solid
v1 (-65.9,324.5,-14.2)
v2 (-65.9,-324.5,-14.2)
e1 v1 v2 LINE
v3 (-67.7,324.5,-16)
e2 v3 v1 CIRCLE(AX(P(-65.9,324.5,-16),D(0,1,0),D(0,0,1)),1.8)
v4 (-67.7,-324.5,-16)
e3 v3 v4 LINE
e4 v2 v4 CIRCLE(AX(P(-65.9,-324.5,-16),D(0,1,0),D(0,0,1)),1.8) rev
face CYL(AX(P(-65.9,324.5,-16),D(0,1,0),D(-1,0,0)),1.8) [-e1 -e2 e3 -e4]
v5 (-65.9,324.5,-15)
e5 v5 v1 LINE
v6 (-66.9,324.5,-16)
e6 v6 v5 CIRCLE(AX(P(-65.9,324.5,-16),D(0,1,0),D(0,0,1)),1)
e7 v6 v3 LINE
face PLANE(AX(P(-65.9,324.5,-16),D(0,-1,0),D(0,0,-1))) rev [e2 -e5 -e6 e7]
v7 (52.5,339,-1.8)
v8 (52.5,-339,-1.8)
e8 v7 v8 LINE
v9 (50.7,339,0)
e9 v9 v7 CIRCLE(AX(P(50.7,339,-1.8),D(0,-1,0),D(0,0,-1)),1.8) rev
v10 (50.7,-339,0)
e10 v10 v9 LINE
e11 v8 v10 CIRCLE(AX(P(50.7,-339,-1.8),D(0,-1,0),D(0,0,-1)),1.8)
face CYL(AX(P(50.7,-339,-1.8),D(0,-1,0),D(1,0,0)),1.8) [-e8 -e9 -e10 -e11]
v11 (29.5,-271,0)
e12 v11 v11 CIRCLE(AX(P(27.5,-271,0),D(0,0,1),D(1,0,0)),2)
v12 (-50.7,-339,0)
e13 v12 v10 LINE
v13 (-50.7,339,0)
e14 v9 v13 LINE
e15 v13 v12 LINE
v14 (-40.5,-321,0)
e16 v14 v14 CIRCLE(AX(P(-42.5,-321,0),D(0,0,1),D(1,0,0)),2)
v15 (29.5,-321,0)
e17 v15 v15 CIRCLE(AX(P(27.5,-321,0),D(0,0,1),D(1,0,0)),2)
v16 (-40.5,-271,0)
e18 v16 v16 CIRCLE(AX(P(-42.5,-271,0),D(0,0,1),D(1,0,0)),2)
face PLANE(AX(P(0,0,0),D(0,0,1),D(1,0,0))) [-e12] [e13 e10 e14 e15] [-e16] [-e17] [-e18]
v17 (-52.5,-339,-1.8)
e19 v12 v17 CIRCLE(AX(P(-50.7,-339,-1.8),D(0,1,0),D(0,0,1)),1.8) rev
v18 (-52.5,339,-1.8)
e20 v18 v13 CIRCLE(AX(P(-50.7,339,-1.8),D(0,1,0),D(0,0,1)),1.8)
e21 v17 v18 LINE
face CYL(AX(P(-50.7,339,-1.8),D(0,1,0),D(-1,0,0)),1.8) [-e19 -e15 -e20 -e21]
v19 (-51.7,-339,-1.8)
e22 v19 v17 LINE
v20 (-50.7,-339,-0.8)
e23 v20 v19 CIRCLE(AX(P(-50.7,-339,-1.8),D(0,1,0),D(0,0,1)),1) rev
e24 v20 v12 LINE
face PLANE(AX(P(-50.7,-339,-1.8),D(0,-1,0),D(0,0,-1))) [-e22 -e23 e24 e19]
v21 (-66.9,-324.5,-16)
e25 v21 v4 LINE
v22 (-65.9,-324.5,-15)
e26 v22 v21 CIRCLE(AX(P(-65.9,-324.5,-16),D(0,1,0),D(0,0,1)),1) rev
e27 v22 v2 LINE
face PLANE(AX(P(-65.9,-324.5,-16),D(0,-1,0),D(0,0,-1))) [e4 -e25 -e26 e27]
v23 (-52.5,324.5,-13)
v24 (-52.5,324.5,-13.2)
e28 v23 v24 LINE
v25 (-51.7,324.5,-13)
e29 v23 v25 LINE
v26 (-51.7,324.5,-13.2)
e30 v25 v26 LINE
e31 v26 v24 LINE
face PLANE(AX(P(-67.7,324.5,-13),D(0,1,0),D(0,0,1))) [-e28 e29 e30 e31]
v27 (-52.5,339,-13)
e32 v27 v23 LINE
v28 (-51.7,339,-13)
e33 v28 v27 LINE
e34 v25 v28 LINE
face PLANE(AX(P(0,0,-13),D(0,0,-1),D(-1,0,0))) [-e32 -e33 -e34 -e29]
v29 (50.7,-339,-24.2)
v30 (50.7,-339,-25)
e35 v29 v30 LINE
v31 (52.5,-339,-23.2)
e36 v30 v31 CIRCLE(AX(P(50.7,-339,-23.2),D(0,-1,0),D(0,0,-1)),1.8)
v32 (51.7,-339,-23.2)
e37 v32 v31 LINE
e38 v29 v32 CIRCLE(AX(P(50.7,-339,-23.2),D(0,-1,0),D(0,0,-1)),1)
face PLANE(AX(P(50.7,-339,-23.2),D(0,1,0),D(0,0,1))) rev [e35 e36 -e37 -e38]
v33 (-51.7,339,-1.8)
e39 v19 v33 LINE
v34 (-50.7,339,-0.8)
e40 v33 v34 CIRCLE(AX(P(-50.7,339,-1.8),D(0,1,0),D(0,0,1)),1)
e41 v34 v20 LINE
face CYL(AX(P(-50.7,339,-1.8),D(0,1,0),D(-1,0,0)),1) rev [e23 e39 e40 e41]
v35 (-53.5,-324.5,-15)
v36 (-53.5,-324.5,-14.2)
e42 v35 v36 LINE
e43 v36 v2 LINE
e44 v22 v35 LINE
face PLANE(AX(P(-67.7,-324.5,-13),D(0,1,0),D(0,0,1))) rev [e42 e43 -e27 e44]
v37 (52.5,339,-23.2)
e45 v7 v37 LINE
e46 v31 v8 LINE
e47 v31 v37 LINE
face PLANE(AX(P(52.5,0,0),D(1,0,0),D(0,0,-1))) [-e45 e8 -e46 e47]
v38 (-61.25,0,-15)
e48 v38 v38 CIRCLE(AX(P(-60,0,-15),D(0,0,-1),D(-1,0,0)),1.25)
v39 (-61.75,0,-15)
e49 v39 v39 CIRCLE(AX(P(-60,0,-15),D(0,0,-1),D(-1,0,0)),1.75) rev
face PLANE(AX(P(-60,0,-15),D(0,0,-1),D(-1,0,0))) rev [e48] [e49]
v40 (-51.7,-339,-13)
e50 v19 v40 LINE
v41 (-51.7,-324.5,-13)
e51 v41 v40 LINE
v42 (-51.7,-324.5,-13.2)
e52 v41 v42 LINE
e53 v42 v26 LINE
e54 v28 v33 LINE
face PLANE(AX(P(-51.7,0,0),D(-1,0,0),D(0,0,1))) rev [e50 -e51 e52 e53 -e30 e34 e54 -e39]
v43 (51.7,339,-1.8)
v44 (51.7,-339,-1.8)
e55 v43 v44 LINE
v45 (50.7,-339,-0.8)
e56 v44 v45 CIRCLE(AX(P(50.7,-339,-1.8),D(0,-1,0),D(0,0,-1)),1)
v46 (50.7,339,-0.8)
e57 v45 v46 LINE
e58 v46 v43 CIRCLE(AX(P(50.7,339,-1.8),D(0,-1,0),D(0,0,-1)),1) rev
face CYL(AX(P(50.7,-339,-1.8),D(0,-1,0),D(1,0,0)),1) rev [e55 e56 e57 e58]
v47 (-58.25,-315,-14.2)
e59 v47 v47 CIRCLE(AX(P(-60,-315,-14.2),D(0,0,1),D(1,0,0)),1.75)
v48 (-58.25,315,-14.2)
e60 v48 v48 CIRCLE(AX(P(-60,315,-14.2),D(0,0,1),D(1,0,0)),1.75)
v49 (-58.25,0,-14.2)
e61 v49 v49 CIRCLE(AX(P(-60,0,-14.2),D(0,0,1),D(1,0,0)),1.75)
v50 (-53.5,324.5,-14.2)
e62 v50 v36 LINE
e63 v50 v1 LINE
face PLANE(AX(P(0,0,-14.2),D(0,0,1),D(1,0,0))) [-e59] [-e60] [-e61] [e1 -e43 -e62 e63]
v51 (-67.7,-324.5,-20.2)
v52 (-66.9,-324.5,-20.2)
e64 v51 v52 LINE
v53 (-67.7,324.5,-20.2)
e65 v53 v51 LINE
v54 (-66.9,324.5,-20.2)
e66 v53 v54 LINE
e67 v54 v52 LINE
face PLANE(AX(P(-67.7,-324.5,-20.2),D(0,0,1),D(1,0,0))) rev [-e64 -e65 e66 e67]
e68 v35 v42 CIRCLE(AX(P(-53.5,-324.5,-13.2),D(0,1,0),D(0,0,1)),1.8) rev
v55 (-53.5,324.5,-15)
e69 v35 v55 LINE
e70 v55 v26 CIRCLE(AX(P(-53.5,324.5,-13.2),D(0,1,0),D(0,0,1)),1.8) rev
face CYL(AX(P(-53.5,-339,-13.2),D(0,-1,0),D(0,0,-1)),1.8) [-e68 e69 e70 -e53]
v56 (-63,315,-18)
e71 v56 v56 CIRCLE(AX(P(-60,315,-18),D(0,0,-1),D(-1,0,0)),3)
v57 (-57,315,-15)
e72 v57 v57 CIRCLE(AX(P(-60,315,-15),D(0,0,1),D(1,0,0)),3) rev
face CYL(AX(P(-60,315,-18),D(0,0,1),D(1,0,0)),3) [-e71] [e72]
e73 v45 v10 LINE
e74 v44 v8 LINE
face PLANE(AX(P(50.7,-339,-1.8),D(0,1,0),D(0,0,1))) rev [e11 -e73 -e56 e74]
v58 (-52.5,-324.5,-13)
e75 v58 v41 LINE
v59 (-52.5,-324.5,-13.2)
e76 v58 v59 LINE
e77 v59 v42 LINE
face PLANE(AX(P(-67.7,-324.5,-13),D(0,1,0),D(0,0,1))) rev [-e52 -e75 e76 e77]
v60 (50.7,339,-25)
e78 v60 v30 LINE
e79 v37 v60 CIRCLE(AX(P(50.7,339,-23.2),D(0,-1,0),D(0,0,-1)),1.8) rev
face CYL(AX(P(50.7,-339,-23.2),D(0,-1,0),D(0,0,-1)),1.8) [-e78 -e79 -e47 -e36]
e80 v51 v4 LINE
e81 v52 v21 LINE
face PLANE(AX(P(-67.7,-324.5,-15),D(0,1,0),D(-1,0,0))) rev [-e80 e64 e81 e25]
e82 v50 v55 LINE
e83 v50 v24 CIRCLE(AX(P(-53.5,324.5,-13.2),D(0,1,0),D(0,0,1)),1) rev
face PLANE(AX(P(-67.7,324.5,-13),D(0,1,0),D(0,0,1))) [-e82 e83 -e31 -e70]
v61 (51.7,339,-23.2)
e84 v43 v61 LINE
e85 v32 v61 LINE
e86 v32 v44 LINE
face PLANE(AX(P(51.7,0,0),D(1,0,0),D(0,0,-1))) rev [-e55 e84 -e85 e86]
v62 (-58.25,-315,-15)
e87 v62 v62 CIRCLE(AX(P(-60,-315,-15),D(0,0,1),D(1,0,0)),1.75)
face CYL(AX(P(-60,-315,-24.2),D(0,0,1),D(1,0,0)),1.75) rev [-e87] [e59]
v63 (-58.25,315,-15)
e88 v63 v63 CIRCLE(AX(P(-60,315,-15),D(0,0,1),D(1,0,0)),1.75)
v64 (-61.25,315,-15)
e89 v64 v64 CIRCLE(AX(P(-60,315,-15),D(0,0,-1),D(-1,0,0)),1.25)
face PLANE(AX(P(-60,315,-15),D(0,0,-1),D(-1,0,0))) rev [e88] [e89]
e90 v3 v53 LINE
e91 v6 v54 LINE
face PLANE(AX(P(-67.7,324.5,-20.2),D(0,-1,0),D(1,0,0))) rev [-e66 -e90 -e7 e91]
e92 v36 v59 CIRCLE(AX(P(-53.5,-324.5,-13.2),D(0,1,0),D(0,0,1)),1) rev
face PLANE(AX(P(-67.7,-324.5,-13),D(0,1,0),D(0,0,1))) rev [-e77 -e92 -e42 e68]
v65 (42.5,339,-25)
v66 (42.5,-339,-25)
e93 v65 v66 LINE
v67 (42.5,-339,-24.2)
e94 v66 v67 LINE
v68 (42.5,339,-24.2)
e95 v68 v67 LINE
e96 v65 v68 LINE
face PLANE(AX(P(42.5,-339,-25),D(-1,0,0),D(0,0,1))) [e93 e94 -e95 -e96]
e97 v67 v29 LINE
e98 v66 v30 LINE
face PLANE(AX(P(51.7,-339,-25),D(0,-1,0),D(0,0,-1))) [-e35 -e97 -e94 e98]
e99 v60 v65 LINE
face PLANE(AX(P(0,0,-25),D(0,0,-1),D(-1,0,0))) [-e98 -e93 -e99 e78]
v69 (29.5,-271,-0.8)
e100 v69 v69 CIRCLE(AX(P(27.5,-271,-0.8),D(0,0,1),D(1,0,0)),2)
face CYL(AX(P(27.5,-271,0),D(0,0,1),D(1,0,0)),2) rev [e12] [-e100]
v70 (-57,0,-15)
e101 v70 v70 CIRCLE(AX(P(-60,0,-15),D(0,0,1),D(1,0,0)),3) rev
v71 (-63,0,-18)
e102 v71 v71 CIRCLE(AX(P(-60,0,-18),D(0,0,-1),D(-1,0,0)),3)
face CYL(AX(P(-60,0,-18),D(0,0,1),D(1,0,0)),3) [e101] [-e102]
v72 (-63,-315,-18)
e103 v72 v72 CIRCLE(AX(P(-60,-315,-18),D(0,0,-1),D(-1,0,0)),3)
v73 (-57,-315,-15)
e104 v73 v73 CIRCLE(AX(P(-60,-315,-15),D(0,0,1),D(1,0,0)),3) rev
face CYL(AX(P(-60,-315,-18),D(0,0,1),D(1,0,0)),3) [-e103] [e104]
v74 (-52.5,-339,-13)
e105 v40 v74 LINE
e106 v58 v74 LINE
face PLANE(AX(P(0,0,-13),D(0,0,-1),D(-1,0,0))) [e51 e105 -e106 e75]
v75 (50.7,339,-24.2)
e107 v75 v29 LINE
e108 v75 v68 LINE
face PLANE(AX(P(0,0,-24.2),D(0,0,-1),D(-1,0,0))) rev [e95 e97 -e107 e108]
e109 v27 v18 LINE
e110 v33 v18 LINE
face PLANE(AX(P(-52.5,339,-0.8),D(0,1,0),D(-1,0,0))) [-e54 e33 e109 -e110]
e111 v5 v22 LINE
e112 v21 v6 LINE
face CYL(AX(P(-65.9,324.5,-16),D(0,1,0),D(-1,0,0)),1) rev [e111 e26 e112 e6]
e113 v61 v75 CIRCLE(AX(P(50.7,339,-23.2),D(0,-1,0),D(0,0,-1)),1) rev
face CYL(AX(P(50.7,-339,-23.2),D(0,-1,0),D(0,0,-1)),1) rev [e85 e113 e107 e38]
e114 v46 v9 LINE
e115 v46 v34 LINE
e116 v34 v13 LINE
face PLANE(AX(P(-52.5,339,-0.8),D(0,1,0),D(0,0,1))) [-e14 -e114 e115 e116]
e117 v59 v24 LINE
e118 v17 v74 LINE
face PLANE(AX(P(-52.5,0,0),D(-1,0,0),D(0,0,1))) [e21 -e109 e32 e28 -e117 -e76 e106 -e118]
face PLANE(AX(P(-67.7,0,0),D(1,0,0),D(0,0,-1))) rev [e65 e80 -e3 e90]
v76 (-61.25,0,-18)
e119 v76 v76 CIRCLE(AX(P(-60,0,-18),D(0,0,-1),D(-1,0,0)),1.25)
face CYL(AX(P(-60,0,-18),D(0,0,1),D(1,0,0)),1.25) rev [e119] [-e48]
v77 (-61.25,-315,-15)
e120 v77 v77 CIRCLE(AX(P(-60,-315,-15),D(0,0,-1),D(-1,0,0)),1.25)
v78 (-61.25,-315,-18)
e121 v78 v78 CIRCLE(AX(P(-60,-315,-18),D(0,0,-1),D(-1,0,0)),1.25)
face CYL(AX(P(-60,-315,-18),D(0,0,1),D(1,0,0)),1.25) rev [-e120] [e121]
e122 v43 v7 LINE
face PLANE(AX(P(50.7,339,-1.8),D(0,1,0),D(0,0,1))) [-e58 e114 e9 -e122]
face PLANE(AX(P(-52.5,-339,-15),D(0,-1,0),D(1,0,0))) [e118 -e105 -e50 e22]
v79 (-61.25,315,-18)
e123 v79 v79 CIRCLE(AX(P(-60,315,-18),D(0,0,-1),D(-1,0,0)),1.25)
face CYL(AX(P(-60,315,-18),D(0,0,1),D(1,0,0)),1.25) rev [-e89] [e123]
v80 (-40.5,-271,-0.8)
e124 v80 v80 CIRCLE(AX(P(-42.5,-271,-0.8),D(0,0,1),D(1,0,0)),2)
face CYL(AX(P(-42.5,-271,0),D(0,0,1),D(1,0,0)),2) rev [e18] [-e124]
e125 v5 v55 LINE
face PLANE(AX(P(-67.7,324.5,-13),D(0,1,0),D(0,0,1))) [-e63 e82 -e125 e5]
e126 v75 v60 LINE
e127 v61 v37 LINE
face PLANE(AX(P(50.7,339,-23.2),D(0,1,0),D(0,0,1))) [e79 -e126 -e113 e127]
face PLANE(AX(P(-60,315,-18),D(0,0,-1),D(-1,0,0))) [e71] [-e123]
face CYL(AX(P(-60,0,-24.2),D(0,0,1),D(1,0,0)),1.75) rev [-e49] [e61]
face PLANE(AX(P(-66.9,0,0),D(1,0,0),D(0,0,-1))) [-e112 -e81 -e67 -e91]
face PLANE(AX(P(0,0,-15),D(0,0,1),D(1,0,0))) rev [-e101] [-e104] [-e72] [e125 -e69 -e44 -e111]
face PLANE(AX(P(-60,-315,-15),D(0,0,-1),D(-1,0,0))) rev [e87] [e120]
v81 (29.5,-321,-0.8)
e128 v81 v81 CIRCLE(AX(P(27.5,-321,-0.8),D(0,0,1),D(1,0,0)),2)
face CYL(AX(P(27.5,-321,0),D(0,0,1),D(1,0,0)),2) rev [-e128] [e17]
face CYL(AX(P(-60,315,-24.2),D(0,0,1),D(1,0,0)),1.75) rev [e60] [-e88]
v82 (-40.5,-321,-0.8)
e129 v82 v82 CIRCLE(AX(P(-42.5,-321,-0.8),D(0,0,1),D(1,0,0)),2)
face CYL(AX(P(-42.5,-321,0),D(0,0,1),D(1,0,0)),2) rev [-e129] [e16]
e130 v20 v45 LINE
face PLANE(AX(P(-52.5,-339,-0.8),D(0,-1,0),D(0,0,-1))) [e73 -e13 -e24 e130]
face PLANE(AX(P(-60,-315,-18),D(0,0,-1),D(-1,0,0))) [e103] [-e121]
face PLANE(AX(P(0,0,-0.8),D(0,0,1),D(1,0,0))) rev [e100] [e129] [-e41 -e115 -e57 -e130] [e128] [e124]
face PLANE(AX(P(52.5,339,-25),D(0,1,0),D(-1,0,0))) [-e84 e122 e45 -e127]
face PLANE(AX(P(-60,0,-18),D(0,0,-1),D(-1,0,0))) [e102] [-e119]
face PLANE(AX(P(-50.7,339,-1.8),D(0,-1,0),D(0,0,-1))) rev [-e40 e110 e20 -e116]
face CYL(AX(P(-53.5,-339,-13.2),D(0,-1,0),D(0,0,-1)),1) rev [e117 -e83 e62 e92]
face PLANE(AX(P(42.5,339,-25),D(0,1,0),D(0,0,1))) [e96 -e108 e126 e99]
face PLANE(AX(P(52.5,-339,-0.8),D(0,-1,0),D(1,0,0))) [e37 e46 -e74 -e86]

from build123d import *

# Parameters (mm, degrees)
SKETCH_15_W                      = 105
SKETCH_15_H                      = 678
SM_BASE_FLANGE_1_DEPTH           = 0.8
SM_EDGE_FLANGE_1_STRIP_W         = 5.2
SM_EDGE_FLANGE_1_STRIP_H         = 0.8
SM_EDGE_FLANGE_1_STRIP_CUT_DEPTH = 678
SM_EDGE_FLANGE_1_DEPTH           = 678
SM_EDGE_FLANGE_2_STRIP_W         = 5.2
SM_EDGE_FLANGE_2_STRIP_H         = 0.8
SM_EDGE_FLANGE_2_STRIP_CUT_DEPTH = 678
SM_EDGE_FLANGE_2_DEPTH           = 678
SM_EDGE_FLANGE_3_STRIP_W         = 5.2
SM_EDGE_FLANGE_3_STRIP_H         = 0.8
SM_EDGE_FLANGE_3_STRIP_CUT_DEPTH = 678
SM_EDGE_FLANGE_3_DEPTH           = 678
SM_EDGE_FLANGE_4_STRIP_W         = 5.2
SM_EDGE_FLANGE_4_STRIP_H         = 0.8
SM_EDGE_FLANGE_4_STRIP_CUT_DEPTH = 678
SM_EDGE_FLANGE_4_DEPTH           = 678
SKETCH_31_W                      = 16
SKETCH_31_H                      = 14.5
CUT_EXTRUDE_1_DEPTH              = 2
SM_EDGE_FLANGE_5_STRIP_W         = 5.2
SM_EDGE_FLANGE_5_STRIP_H         = 0.8
SM_EDGE_FLANGE_5_STRIP_CUT_DEPTH = 649
SM_EDGE_FLANGE_5_DEPTH           = 649
SKETCH_35_R                      = 1.75
CUT_EXTRUDE_2_DEPTH              = 10
SKETCH_36_R                      = 3
SKETCH_36_R_2                    = 1.25
EXTRUDE_1_DEPTH                  = 3
PATTERN_LINEAR_1_COUNT           = 2
PATTERN_LINEAR_1_PITCH           = 315
PATTERN_LINEAR_1_COUNT_DIR2      = 2
PATTERN_LINEAR_1_PITCH_DIR2      = 315
HOLE_WIZARD_4_0_4_1_D            = 4
HOLE_WIZARD_4_0_4_1_DEPTH        = 5.2
HOLE_WIZARD_4_0_4_1_TIP          = 1.201721238


# Sheet-metal steps are written as plain solids
with BuildPart() as part:
    # 草图15 → 基体-法兰1 (new body)
    with BuildSketch(Plane.XY):
        Rectangle(SKETCH_15_W, SKETCH_15_H)
    extrude(amount=-SM_BASE_FLANGE_1_DEPTH)

    # 边线-法兰1 strip (across the edge) → 边线-法兰1 strip cut (cut)
    with BuildSketch(Plane(origin=(52.5, 339, -0.8), x_dir=(-1, 0, 0), z_dir=(0, -1, 0))):
        with Locations((-0.8, -0.4)):
            Rectangle(SM_EDGE_FLANGE_1_STRIP_W, SM_EDGE_FLANGE_1_STRIP_H)
    extrude(amount=SM_EDGE_FLANGE_1_STRIP_CUT_DEPTH, mode=Mode.SUBTRACT)

    # 边线-法兰1 section (across the edge) → 边线-法兰1 (add)
    with BuildSketch(Plane(origin=(52.5, 339, -0.8), x_dir=(-1, 0, 0), z_dir=(0, -1, 0))):
        with BuildLine():
            Line((0, 1), (0, 24.2))
            Line((0, 24.2), (0.8, 24.2))
            Line((0.8, 24.2), (0.8, 1))
            ThreePointArc((0.8, 1), (1.092893219, 0.292893219), (1.8, 0))
            Line((1.8, 0), (1.8, -0.8))
            ThreePointArc((1.8, -0.8), (0.527207794, -0.272792206), (0, 1))
        make_face()
    extrude(amount=SM_EDGE_FLANGE_1_DEPTH)

    # 边线-法兰2 strip (across the edge) → 边线-法兰2 strip cut (cut)
    with BuildSketch(Plane(origin=(51.7, 339, -25), x_dir=(0, 0, 1), z_dir=(0, -1, 0))):
        with Locations((-0.8, -0.4)):
            Rectangle(SM_EDGE_FLANGE_2_STRIP_W, SM_EDGE_FLANGE_2_STRIP_H)
    extrude(amount=SM_EDGE_FLANGE_2_STRIP_CUT_DEPTH, mode=Mode.SUBTRACT)

    # 边线-法兰2 section (across the edge) → 边线-法兰2 (add)
    with BuildSketch(Plane(origin=(51.7, 339, -25), x_dir=(0, 0, 1), z_dir=(0, -1, 0))):
        with BuildLine():
            Line((0, 1), (0, 9.2))
            Line((0, 9.2), (0.8, 9.2))
            Line((0.8, 9.2), (0.8, 1))
            ThreePointArc((0.8, 1), (1.092893219, 0.292893219), (1.8, 0))
            Line((1.8, 0), (1.8, -0.8))
            ThreePointArc((1.8, -0.8), (0.527207794, -0.272792206), (0, 1))
        make_face()
    extrude(amount=SM_EDGE_FLANGE_2_DEPTH)

    # 边线-法兰3 strip (across the edge) → 边线-法兰3 strip cut (cut)
    with BuildSketch(Plane(origin=(-52.5, -339, -0.8), x_dir=(1, 0, 0), z_dir=(0, 1, 0))):
        with Locations((-0.8, -0.4)):
            Rectangle(SM_EDGE_FLANGE_3_STRIP_W, SM_EDGE_FLANGE_3_STRIP_H)
    extrude(amount=SM_EDGE_FLANGE_3_STRIP_CUT_DEPTH, mode=Mode.SUBTRACT)

    # 边线-法兰3 section (across the edge) → 边线-法兰3 (add)
    with BuildSketch(Plane(origin=(-52.5, -339, -0.8), x_dir=(1, 0, 0), z_dir=(0, 1, 0))):
        with BuildLine():
            Line((0, 1), (0, 14.2))
            Line((0, 14.2), (0.8, 14.2))
            Line((0.8, 14.2), (0.8, 1))
            ThreePointArc((0.8, 1), (1.092893219, 0.292893219), (1.8, 0))
            Line((1.8, 0), (1.8, -0.8))
            ThreePointArc((1.8, -0.8), (0.527207794, -0.272792206), (0, 1))
        make_face()
    extrude(amount=SM_EDGE_FLANGE_3_DEPTH)

    # 边线-法兰4 strip (across the edge) → 边线-法兰4 strip cut (cut)
    with BuildSketch(Plane(origin=(-52.5, 339, -15), x_dir=(0, 0, 1), z_dir=(0, -1, 0))):
        with Locations((-0.8, -0.4)):
            Rectangle(SM_EDGE_FLANGE_4_STRIP_W, SM_EDGE_FLANGE_4_STRIP_H)
    extrude(amount=SM_EDGE_FLANGE_4_STRIP_CUT_DEPTH, mode=Mode.SUBTRACT)

    # 边线-法兰4 section (across the edge) → 边线-法兰4 (add)
    with BuildSketch(Plane(origin=(-52.5, 339, -15), x_dir=(0, 0, 1), z_dir=(0, -1, 0))):
        with BuildLine():
            Line((0, 1), (0, 15.2))
            Line((0, 15.2), (0.8, 15.2))
            Line((0.8, 15.2), (0.8, 1))
            ThreePointArc((0.8, 1), (1.092893219, 0.292893219), (1.8, 0))
            Line((1.8, 0), (1.8, -0.8))
            ThreePointArc((1.8, -0.8), (0.527207794, -0.272792206), (0, 1))
        make_face()
    extrude(amount=SM_EDGE_FLANGE_4_DEPTH)

    # 草图31 → 切除-拉伸1 (cut)
    with BuildSketch(Plane(origin=(0, 0, -15), x_dir=(-1, 0, 0), z_dir=(0, 0, -1))):
        with Locations((59.7, -331.75)):
            Rectangle(SKETCH_31_W, SKETCH_31_H)
    cut_extrude_1 = extrude(amount=-CUT_EXTRUDE_1_DEPTH, mode=Mode.SUBTRACT)

    # 镜向1: 切除-拉伸1 across plane
    add(cut_extrude_1.mirror(Plane.ZX), mode=Mode.SUBTRACT)

    # 边线-法兰5 strip (across the edge) → 边线-法兰5 strip cut (cut)
    with BuildSketch(Plane(origin=(-67.7, -324.5, -15), x_dir=(1, 0, 0), z_dir=(0, 1, 0))):
        with Locations((-0.8, -0.4)):
            Rectangle(SM_EDGE_FLANGE_5_STRIP_W, SM_EDGE_FLANGE_5_STRIP_H)
    extrude(amount=SM_EDGE_FLANGE_5_STRIP_CUT_DEPTH, mode=Mode.SUBTRACT)

    # 边线-法兰5 section (across the edge) → 边线-法兰5 (add)
    with BuildSketch(Plane(origin=(-67.7, -324.5, -15), x_dir=(1, 0, 0), z_dir=(0, 1, 0))):
        with BuildLine():
            Line((0, 1), (0, 5.2))
            Line((0, 5.2), (0.8, 5.2))
            Line((0.8, 5.2), (0.8, 1))
            ThreePointArc((0.8, 1), (1.092893219, 0.292893219), (1.8, 0))
            Line((1.8, 0), (1.8, -0.8))
            ThreePointArc((1.8, -0.8), (0.527207794, -0.272792206), (0, 1))
        make_face()
    extrude(amount=SM_EDGE_FLANGE_5_DEPTH)

    # 草图35 → 切除-拉伸2 (cut)
    with BuildSketch(Plane.XY.offset(-14.2)):
        with Locations((-60, 0)):
            Circle(SKETCH_35_R)
    cut_extrude_2 = extrude(amount=-CUT_EXTRUDE_2_DEPTH, mode=Mode.SUBTRACT)

    # 草图36 → 凸台-拉伸1 (add)
    with BuildSketch(Plane(origin=(0, 0, -15), x_dir=(-1, 0, 0), z_dir=(0, 0, -1))):
        with Locations(Location((60, 0, 0), (0, 0, 180))):
            Circle(SKETCH_36_R)
        with Locations((60, 0)):
            Circle(SKETCH_36_R_2, mode=Mode.SUBTRACT)
    extrude_1 = extrude(amount=EXTRUDE_1_DEPTH)

    # 阵列(线性)1: 切除-拉伸2, Extrude 1 2 × 2
    with Locations(*[Vector(0, -1, 0) * (i * PATTERN_LINEAR_1_PITCH) + Vector(0, 1, 0) * (j * PATTERN_LINEAR_1_PITCH_DIR2) for i in range(PATTERN_LINEAR_1_COUNT) for j in range(PATTERN_LINEAR_1_COUNT_DIR2) if (i, j) != (0, 0)]):
        add(cut_extrude_2, mode=Mode.SUBTRACT)
        add(extrude_1)

    # Ø4.0 (4) 直径孔1
    with Locations(Plane.XY):
        with Locations((-42.5, -271), (-42.5, -321), (27.5, -321), (27.5, -271)):
            Hole(HOLE_WIZARD_4_0_4_1_D / 2, depth=HOLE_WIZARD_4_0_4_1_DEPTH)
            with Locations((0, 0, -(HOLE_WIZARD_4_0_4_1_DEPTH + HOLE_WIZARD_4_0_4_1_TIP / 2))):  # 118° drill point
                Cone(0, HOLE_WIZARD_4_0_4_1_D / 2, HOLE_WIZARD_4_0_4_1_TIP, mode=Mode.SUBTRACT)


solid = part.part
